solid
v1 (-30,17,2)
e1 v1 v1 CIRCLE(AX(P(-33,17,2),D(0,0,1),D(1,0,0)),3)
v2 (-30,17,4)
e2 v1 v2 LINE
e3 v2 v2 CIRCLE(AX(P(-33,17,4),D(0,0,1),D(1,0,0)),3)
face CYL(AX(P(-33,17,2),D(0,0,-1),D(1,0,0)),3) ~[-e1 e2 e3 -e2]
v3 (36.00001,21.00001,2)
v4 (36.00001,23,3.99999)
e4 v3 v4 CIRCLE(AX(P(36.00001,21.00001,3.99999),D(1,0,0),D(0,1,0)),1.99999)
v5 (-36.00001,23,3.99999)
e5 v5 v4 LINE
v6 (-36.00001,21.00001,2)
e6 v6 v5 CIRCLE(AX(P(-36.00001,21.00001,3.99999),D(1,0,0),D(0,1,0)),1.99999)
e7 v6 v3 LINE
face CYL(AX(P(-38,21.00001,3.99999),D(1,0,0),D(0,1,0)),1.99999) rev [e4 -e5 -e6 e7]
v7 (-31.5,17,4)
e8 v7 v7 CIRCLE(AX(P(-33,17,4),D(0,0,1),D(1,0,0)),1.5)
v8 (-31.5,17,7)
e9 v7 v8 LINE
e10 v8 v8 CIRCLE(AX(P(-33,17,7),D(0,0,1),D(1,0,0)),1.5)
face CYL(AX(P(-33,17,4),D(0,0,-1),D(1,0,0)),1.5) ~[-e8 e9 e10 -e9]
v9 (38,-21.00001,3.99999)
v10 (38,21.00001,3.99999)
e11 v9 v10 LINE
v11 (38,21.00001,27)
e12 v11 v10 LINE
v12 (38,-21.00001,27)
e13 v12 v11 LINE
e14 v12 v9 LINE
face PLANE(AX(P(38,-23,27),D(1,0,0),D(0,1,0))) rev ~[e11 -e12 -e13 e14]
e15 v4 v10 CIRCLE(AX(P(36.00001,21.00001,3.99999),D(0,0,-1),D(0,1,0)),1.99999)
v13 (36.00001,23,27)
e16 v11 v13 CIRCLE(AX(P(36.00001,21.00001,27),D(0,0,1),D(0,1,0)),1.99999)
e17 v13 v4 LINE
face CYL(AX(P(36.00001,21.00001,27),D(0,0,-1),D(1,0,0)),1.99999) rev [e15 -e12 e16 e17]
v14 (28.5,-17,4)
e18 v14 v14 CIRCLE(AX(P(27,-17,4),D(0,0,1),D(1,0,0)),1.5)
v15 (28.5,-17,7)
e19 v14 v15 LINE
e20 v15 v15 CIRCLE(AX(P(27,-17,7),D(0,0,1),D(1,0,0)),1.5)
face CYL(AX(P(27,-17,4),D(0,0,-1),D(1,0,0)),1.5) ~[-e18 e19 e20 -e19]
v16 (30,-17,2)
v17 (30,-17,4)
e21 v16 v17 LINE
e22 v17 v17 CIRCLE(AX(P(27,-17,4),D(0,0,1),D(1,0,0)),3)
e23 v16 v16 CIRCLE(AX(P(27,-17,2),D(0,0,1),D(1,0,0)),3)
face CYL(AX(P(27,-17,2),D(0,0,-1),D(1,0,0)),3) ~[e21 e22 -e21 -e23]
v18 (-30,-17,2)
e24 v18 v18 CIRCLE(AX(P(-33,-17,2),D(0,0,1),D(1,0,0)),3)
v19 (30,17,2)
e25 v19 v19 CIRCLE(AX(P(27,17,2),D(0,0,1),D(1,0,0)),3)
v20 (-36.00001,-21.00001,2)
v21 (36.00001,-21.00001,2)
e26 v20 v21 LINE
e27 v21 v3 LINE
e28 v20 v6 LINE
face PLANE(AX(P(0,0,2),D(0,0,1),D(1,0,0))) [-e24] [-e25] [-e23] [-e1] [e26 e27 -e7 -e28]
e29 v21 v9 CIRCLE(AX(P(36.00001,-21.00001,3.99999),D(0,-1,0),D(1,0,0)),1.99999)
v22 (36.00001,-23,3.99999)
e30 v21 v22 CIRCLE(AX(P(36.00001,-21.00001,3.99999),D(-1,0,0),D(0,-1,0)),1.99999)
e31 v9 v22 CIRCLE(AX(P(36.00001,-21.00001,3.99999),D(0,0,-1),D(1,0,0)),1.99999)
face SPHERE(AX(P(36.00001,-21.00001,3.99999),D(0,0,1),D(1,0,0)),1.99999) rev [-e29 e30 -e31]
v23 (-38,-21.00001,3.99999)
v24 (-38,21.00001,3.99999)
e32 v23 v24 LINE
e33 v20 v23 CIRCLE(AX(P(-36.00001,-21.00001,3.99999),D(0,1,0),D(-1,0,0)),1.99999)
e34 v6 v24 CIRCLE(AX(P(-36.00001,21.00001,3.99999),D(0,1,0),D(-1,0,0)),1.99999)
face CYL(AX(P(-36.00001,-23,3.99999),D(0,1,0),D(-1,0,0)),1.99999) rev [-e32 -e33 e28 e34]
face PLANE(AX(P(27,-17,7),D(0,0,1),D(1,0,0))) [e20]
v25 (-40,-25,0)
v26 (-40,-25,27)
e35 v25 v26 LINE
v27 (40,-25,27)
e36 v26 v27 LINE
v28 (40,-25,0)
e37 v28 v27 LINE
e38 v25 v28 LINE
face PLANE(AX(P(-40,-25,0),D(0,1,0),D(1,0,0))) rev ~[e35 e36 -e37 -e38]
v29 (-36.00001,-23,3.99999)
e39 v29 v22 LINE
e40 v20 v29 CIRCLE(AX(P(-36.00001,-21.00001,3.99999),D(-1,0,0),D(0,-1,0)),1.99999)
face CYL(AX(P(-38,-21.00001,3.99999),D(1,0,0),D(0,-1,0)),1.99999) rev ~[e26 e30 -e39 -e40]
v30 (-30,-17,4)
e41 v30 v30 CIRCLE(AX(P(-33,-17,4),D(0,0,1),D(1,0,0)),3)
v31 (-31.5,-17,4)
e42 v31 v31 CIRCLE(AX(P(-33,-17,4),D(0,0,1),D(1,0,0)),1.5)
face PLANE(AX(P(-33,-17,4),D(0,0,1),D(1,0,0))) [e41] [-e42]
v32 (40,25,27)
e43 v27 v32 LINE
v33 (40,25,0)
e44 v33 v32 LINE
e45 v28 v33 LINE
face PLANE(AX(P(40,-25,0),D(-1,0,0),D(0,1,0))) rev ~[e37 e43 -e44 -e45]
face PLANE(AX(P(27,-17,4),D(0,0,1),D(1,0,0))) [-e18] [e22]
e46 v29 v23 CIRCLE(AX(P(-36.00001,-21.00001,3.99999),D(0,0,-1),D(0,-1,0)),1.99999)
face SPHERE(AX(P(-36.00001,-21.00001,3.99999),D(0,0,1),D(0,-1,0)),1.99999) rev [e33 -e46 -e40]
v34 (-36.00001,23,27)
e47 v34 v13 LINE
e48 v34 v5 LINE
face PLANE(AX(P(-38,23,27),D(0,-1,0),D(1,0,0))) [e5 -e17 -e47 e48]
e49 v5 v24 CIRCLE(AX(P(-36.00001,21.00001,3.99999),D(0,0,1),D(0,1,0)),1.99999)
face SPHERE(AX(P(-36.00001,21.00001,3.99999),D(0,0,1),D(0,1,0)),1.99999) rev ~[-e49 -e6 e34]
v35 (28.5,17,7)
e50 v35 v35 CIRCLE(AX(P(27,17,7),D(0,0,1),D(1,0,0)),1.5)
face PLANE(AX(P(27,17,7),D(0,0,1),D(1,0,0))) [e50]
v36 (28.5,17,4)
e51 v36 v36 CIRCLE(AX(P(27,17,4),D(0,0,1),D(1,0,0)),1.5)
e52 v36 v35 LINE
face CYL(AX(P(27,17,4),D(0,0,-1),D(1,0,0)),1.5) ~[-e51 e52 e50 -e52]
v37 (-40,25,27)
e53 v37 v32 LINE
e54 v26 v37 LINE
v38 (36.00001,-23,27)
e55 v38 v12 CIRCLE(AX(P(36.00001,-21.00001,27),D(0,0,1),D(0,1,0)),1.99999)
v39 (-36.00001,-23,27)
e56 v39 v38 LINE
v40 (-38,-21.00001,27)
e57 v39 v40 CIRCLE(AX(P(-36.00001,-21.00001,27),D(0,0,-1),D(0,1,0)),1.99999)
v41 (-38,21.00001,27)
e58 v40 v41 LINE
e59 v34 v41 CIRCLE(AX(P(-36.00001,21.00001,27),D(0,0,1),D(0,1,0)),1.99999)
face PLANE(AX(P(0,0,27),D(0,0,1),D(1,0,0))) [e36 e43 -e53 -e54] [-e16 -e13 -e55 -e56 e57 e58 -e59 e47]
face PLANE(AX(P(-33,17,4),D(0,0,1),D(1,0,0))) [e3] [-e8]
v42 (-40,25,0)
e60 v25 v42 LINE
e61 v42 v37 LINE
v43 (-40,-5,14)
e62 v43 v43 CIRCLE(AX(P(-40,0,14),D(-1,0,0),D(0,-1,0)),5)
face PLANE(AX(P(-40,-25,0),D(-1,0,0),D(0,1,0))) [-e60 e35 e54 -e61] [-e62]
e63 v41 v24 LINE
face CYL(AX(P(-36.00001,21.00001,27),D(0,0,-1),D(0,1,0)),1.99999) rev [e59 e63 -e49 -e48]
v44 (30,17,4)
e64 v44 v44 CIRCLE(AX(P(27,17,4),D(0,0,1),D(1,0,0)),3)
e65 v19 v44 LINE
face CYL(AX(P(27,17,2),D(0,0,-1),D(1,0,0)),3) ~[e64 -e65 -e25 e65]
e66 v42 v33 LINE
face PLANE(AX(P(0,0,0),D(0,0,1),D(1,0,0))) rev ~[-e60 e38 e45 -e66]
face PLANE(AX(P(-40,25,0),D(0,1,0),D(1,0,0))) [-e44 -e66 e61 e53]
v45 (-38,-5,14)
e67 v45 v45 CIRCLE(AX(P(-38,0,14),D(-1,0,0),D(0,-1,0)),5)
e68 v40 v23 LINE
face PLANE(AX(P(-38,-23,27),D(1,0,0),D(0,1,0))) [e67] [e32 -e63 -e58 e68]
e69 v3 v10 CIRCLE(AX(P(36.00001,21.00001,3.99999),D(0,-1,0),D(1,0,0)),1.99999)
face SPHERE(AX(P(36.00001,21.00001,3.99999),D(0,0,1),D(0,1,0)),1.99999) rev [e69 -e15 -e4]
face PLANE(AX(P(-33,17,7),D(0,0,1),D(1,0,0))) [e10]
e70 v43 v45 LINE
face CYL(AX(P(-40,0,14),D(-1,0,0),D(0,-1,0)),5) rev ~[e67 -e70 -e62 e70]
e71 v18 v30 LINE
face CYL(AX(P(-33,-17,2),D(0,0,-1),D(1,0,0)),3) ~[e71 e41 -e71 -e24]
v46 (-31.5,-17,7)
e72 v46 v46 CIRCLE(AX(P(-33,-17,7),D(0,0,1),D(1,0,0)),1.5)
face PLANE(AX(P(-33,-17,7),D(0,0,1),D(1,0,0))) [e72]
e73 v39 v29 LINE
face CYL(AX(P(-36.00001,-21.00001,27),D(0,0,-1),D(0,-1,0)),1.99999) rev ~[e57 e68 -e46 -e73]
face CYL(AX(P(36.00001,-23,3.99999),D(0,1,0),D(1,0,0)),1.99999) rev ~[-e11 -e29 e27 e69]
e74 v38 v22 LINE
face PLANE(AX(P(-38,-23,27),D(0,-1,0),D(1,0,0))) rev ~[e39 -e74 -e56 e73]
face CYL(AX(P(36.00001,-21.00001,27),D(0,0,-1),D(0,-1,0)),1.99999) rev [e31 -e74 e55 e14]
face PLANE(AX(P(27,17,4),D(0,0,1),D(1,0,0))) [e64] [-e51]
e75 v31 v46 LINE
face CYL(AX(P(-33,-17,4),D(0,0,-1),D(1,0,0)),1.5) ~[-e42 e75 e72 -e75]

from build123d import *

# Parameters (mm, degrees)
F0_W     = 80
F0_H     = 50
F1_DEPTH = 27
F2_W     = 76
F2_H     = 46
F3_DEPTH = 25
F4_R     = 3
F5_DEPTH = 2
F6_R     = 1.5
F7_DEPTH = 3
F8_R     = 5
F9_DEPTH = 25
F10_R    = 1.99999


# Not quite as in the source:
# - a fillet or chamfer is up to 0.001 mm smaller than in the source, because OpenCascade refuses the exact size


with BuildPart() as f1:
    # F0 (on Top) → F1 (new body)
    with BuildSketch(Plane.XY):
        Rectangle(F0_W, F0_H)
    extrude(amount=F1_DEPTH)

    # F2 (on face) → F3 (cut)
    with BuildSketch(Plane.XY.offset(27)):
        Rectangle(F2_W, F2_H)
    extrude(amount=-F3_DEPTH, mode=Mode.SUBTRACT)

    # F4 (on face) → F5 (join)
    with BuildSketch(Plane.XY.offset(2)):
        with Locations((-33, 17)):
            Circle(F4_R)
        with Locations((27, 17)):
            Circle(F4_R)
        with Locations((27, -17)):
            Circle(F4_R)
        with Locations((-33, -17)):
            Circle(F4_R)
    extrude(amount=F5_DEPTH)

    # F6 (on face) → F7 (join)
    with BuildSketch(Plane.XY.offset(4)):
        with Locations((-33, 17)):
            Circle(F6_R)
        with Locations((27, 17)):
            Circle(F6_R)
        with Locations((27, -17)):
            Circle(F6_R)
        with Locations((-33, -17)):
            Circle(F6_R)
    extrude(amount=F7_DEPTH)

    # F8 (on face) → F9 (cut)
    with BuildSketch(Plane(origin=(-40, 0, 0), x_dir=(0, -1, 0), z_dir=(-1, 0, 0))):
        with Locations((0, 14)):
            Circle(F8_R)
    extrude(amount=-F9_DEPTH, mode=Mode.SUBTRACT)

    # F10 (radius 2 in the source; OpenCascade refuses exactly that, so slightly less here)
    f10_edges = [f1.edges().sort_by_distance(p)[0] for p in [
        (-38, 23, 14.5),
        (38, 23, 14.5),
        (38, -23, 14.5),
        (-38, -23, 14.5),
        (0, 23, 2),
        (38, 0, 2),
        (0, -23, 2),
        (-38, 0, 2),
    ]]
    fillet(f10_edges, radius=F10_R)


solid = f1.part
